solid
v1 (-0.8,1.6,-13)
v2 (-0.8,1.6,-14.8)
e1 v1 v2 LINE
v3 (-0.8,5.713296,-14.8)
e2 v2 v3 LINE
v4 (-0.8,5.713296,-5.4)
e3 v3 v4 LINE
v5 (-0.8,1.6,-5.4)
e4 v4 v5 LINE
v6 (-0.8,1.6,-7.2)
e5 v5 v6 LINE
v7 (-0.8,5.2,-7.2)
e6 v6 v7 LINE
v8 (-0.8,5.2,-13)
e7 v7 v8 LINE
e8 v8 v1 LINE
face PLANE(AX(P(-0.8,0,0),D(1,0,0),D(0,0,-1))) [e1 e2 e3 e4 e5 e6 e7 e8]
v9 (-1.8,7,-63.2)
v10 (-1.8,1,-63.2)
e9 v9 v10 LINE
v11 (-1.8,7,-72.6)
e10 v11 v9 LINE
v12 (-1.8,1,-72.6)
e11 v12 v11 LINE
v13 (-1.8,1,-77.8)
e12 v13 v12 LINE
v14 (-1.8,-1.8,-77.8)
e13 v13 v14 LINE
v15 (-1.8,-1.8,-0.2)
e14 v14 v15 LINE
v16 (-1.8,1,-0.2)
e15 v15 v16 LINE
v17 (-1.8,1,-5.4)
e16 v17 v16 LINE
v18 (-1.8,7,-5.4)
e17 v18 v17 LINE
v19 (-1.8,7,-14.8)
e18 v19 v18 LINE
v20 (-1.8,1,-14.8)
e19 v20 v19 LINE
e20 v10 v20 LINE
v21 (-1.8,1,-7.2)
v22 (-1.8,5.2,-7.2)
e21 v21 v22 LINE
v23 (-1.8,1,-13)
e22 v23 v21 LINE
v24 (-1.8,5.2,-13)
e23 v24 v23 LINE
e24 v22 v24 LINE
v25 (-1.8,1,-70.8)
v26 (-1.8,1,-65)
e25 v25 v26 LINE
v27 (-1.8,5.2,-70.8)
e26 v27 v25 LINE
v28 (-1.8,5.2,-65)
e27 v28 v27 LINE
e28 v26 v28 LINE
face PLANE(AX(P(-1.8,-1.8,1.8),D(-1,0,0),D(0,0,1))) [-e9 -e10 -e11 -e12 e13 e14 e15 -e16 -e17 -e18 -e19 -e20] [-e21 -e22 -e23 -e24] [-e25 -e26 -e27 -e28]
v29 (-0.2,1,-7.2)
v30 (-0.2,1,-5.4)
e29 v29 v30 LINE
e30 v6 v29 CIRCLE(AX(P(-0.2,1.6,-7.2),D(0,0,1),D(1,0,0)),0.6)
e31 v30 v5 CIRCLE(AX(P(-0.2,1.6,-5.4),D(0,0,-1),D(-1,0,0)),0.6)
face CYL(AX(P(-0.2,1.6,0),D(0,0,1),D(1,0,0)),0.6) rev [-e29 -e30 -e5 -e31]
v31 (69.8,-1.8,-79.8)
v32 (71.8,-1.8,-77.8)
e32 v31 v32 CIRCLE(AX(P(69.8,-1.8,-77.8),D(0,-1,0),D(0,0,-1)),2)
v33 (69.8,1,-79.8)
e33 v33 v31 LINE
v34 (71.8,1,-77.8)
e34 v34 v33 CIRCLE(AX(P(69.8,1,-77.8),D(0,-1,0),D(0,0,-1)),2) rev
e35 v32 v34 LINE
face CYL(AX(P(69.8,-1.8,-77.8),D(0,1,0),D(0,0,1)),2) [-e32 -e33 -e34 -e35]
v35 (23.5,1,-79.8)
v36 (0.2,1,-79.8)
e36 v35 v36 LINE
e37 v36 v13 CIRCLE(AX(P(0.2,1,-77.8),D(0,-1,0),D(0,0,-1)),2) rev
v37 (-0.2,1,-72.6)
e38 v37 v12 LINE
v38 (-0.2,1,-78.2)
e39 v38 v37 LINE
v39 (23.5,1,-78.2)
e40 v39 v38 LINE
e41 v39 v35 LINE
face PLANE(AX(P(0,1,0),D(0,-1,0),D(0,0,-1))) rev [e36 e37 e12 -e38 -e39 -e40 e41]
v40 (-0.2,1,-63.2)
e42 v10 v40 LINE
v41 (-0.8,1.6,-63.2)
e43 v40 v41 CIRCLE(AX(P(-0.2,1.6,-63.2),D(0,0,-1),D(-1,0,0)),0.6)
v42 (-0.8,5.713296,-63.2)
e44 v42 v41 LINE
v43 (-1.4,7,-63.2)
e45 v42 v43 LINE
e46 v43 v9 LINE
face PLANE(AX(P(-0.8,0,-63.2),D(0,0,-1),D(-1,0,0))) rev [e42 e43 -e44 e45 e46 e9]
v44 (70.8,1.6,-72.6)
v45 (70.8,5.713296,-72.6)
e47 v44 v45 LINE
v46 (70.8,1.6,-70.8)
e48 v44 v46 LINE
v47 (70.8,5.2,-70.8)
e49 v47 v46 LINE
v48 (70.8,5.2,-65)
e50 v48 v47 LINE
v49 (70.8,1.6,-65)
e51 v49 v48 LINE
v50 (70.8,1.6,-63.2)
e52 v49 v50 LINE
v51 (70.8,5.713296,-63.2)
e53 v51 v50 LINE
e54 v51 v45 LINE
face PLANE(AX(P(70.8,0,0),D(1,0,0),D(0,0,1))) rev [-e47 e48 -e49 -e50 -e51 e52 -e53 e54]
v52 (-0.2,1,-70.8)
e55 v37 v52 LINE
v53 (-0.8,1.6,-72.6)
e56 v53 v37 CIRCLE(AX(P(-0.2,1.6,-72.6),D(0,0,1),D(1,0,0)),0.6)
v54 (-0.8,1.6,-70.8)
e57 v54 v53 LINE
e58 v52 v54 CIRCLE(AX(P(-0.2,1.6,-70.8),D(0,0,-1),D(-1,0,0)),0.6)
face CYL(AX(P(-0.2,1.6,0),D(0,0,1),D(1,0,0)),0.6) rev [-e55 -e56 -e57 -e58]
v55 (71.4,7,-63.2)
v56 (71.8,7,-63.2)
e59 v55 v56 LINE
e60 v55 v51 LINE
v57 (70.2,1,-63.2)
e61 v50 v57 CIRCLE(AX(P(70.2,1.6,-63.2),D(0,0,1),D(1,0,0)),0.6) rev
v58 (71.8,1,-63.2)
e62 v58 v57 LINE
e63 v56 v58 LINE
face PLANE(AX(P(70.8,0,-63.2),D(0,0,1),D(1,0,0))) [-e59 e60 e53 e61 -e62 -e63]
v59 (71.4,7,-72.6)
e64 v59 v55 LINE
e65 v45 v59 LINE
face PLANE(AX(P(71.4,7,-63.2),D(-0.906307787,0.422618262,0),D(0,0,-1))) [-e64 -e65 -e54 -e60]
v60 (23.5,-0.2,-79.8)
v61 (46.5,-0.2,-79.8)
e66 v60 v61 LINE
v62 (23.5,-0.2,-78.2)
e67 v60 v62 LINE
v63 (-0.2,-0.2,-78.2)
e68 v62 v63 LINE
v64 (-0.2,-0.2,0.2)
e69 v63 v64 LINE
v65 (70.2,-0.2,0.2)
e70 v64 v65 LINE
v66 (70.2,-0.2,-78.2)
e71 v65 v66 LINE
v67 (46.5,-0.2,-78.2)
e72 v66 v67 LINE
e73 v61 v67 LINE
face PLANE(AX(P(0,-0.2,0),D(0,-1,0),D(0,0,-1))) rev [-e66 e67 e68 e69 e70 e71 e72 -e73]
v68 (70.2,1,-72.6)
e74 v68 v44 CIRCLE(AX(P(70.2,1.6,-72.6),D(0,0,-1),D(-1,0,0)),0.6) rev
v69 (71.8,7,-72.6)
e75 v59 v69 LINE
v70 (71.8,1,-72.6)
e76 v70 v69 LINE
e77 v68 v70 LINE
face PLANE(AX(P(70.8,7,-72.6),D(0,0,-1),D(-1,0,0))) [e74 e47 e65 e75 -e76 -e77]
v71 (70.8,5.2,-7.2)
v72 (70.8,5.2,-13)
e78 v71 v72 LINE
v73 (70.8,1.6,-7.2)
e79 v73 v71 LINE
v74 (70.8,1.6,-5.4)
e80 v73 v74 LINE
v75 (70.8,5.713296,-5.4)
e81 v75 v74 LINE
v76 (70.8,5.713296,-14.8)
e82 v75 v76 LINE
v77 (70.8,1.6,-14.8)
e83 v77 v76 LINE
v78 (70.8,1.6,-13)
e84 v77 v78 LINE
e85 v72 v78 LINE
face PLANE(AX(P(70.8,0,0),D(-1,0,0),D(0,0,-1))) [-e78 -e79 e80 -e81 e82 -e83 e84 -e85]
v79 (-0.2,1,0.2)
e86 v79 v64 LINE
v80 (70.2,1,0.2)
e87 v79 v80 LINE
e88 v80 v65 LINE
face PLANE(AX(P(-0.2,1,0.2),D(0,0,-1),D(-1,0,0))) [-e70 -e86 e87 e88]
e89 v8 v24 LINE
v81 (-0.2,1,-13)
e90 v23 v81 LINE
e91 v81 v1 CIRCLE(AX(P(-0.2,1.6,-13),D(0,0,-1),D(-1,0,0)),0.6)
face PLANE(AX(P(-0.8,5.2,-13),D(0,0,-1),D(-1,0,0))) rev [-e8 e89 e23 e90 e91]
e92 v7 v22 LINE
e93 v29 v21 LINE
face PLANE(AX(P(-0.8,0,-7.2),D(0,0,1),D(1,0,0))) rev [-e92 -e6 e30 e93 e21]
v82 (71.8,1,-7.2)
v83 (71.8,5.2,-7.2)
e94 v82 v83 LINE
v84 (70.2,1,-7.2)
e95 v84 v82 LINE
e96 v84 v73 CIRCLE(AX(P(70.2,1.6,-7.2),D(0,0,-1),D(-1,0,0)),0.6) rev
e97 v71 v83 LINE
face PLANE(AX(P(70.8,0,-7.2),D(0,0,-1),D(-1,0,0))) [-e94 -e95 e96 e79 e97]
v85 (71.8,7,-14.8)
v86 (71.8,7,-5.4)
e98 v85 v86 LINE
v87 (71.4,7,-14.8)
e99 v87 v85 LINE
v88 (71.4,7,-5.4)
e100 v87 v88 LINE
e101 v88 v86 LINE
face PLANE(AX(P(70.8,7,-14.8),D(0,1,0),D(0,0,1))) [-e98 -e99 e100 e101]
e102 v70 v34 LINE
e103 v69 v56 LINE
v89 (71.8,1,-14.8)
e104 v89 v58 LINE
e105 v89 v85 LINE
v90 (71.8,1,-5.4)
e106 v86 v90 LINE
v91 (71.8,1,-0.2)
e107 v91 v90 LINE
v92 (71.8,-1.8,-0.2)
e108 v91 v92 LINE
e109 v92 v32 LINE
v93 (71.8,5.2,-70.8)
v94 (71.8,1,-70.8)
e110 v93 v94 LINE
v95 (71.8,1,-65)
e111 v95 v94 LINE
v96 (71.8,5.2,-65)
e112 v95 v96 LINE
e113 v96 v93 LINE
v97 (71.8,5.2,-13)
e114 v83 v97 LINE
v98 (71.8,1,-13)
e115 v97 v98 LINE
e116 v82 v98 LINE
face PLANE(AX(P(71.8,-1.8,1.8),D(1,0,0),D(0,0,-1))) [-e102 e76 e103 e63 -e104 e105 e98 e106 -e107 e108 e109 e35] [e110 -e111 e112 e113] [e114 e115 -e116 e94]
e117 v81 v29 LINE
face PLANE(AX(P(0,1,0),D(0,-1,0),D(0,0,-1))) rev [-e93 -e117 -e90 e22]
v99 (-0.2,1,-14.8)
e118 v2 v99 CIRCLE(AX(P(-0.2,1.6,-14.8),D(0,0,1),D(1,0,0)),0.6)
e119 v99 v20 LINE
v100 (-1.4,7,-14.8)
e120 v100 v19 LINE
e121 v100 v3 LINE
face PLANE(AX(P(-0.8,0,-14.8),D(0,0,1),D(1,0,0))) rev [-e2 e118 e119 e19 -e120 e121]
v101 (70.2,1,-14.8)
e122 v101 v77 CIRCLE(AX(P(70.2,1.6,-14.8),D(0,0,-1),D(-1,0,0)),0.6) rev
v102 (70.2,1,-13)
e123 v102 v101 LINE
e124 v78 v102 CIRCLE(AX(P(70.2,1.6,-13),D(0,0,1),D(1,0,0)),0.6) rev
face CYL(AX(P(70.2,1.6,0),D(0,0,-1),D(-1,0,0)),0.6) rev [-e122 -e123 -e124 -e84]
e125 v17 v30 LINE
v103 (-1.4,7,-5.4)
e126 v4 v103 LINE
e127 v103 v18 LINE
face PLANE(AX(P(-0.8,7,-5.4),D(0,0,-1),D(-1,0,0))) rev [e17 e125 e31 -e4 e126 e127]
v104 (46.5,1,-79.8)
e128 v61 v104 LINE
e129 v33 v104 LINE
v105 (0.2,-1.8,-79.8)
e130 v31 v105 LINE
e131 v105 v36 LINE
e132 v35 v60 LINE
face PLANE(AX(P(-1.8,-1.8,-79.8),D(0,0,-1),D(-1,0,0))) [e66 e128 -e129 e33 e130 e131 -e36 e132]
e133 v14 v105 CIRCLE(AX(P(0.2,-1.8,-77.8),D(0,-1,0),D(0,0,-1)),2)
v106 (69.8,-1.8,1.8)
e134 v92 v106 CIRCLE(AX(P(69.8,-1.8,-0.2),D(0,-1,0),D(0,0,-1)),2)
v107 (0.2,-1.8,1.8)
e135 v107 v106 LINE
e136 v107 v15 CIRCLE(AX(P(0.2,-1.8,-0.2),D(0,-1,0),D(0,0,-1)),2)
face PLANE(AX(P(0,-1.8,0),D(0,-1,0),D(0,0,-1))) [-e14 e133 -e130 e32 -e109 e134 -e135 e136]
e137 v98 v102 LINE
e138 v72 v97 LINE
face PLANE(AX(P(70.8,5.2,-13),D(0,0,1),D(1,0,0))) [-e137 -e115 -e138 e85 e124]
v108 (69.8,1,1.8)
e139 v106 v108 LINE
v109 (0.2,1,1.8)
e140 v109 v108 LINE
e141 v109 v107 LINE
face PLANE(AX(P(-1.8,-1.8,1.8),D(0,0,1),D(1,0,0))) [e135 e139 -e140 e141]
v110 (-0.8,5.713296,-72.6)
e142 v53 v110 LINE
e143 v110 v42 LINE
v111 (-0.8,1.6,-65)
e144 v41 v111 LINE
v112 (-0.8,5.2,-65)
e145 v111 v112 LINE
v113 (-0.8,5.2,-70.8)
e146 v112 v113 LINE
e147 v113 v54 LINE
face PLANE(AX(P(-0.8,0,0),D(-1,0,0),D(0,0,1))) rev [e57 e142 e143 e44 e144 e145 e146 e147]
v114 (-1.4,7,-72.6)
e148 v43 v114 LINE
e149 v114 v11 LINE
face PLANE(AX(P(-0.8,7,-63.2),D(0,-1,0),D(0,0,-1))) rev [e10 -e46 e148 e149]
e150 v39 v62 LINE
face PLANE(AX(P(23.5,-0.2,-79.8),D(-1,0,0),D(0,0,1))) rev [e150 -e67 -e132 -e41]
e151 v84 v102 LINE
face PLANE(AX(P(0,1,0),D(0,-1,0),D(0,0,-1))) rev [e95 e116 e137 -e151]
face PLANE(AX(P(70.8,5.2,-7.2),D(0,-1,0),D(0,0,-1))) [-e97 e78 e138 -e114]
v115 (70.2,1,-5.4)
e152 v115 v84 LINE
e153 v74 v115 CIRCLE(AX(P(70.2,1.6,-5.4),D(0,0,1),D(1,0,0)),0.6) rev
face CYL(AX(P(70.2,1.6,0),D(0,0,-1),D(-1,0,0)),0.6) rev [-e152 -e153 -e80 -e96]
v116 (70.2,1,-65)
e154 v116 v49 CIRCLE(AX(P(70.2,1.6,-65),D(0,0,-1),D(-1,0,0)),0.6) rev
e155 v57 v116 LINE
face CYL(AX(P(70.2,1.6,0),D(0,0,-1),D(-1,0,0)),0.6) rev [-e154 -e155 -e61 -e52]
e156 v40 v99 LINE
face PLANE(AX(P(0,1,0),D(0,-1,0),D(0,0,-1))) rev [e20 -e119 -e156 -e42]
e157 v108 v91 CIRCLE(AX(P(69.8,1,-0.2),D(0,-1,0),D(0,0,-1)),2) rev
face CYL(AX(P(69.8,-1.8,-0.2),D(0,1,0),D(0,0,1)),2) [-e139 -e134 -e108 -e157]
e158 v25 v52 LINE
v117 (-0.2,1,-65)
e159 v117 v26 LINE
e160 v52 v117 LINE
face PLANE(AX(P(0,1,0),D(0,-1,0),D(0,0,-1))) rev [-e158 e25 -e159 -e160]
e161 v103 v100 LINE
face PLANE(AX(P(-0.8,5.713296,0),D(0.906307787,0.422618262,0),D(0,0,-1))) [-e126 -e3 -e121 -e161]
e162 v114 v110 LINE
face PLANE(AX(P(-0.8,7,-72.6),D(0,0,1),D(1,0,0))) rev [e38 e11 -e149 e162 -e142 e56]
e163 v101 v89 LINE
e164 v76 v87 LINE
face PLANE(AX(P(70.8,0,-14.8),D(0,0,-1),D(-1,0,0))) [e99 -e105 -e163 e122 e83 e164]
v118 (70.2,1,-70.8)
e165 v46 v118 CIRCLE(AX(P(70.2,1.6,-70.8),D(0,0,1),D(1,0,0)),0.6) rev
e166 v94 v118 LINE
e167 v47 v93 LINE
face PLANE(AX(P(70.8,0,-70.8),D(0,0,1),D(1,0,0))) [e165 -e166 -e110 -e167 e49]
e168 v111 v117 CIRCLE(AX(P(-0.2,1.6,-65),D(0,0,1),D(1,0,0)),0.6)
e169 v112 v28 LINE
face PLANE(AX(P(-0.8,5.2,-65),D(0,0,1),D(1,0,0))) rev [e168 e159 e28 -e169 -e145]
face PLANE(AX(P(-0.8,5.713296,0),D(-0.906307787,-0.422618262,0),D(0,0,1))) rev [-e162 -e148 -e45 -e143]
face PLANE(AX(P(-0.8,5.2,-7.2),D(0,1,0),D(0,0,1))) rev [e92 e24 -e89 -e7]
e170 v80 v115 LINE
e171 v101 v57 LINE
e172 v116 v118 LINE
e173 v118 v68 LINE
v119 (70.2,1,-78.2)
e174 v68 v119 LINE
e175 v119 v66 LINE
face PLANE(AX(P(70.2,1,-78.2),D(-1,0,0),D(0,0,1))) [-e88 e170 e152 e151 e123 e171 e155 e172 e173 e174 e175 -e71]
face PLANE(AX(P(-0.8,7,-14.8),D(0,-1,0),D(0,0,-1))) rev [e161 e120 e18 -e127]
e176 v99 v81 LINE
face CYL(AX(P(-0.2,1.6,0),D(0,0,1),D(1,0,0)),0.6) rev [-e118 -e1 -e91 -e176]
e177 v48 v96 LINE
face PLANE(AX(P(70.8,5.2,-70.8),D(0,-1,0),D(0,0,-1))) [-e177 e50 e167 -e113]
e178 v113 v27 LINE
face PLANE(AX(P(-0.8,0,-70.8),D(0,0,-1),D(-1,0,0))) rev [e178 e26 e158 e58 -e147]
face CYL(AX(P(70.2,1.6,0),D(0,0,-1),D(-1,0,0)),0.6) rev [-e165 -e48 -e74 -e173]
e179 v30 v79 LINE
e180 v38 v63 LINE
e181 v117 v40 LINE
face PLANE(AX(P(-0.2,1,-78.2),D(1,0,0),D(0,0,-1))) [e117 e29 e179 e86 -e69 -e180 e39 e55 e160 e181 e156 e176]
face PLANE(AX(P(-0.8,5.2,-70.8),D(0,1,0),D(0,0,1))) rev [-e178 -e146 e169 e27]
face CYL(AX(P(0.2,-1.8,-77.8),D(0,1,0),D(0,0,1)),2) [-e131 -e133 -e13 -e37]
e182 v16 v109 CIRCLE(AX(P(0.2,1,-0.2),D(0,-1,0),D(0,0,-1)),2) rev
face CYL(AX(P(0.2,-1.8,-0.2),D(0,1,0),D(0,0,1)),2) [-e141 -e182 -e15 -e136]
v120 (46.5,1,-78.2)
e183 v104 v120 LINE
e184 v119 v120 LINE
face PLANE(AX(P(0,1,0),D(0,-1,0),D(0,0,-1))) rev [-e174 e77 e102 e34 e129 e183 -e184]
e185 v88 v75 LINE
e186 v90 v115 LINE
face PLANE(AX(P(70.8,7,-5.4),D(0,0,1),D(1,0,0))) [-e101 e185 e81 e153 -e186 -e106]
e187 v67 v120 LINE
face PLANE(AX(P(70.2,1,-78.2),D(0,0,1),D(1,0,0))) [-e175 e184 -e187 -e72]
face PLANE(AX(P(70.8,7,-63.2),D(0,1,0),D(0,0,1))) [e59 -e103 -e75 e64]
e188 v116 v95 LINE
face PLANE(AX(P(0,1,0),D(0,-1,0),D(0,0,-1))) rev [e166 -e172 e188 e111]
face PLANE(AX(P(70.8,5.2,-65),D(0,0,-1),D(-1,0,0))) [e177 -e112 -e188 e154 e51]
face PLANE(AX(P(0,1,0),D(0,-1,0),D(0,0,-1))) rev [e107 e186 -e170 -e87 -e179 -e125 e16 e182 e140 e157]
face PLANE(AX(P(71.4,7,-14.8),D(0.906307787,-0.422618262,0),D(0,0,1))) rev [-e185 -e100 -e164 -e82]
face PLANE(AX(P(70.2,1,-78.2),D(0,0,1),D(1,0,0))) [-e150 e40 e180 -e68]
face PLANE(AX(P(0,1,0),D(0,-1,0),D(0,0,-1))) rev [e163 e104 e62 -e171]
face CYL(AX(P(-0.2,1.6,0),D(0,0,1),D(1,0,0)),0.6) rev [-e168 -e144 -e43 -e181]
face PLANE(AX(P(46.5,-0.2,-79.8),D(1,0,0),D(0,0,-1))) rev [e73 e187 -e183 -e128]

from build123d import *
from OCP.BRepFilletAPI import BRepFilletAPI_MakeChamfer

# Parameters (mm, degrees)
SKIZZE1_W                       = 73.6
SKIZZE1_H                       = 81.6
AUFSATZ_LINEAR_AUSTRAGEN1_DEPTH = 1.6
SKIZZE2_W                       = 73.6
SKIZZE2_H                       = 81.6
SKIZZE2_W_2                     = 70.4
SKIZZE2_H_2                     = 78.4
AUFSATZ_LINEAR_AUSTRAGEN2_DEPTH = 1.2
SKIZZE3_W                       = 23
SKIZZE3_H                       = 4
SCHNITT_LINEAR_AUSTRAGEN1_DEPTH = 1.6
AUFSATZ_LINEAR_AUSTRAGEN3_DEPTH = 1
VERRUNDUNG1_R                   = 0.6
FASE1_SIZE                      = 0.6
FASE1_SIZE2                     = 1.286704152
VERRUNDUNG2_R                   = 2


with BuildPart() as part:
    # Skizze1 → Aufsatz-Linear austragen1 (new body)
    with BuildSketch(Plane(origin=(0, -0.2, 0), x_dir=(1, 0, 0), z_dir=(0, 1, 0))):
        with Locations((35, 39)):
            Rectangle(SKIZZE1_W, SKIZZE1_H)
    extrude(amount=-AUFSATZ_LINEAR_AUSTRAGEN1_DEPTH)

    # Skizze2 → Aufsatz-Linear austragen2 (add)
    with BuildSketch(Plane(origin=(0, -0.2, 0), x_dir=(1, 0, 0), z_dir=(0, 1, 0))):
        with Locations((35, 39)):
            Rectangle(SKIZZE2_W, SKIZZE2_H)
        with Locations((35, 39)):
            Rectangle(SKIZZE2_W_2, SKIZZE2_H_2, mode=Mode.SUBTRACT)
    extrude(amount=AUFSATZ_LINEAR_AUSTRAGEN2_DEPTH)

    # Skizze3 → Schnitt-Linear austragen1 (cut)
    with BuildSketch(Plane.XY.offset(-78.2)):
        with Locations((35, 1.8)):
            Rectangle(SKIZZE3_W, SKIZZE3_H)
    extrude(amount=-SCHNITT_LINEAR_AUSTRAGEN1_DEPTH, mode=Mode.SUBTRACT)

    # Skizze4 → Aufsatz-Linear austragen3 (add)
    with BuildSketch(Plane(origin=(-1.8, 0, 0), x_dir=(0, 0, -1), z_dir=(1, 0, 0))):
        Polygon((63.2, 0), (63.2, 7), (72.6, 7), (72.6, 0), (70.8, 0), (70.8, 5.2), (65, 5.2), (65, 0), align=None)
        Polygon((14.8, 7), (5.4, 7), (5.4, 0), (7.2, 0), (7.2, 5.2), (13, 5.2), (13, 0), (14.8, 0), align=None)
    aufsatz_linear_austragen3 = extrude(amount=AUFSATZ_LINEAR_AUSTRAGEN3_DEPTH)

    # Spiegeln1: Aufsatz-Linear austragen3 across plane
    add(aufsatz_linear_austragen3.mirror(Plane(origin=(35, 0, 0), x_dir=(0, 0, 1), z_dir=(1, 0, 0))))

    # Verrundung1
    verrundung1_edges = [part.edges().sort_by_distance(p)[0] for p in [
        (70.8, 1, -64.1),
        (70.8, 1, -71.7),
        (70.8, 1, -13.9),
        (70.8, 1, -6.3),
        (-0.8, 1, -71.7),
        (-0.8, 1, -64.1),
        (-0.8, 1, -6.3),
        (-0.8, 1, -13.9),
    ]]
    fillet(verrundung1_edges, radius=VERRUNDUNG1_R - 0.0001)  # a hair under: the kernel refuses the full size

    # Fase1: one chamfer whose edges measure the first distance from different faces: ONE call of the kernel's chamfer builder (chamfer() names one face for all edges)
    fase1_edges_1 = [part.edges().sort_by_distance(p)[0] for p in [
        (70.8, 7, -67.9),
    ]]
    fase1_side_1 = [part.faces().sort_by_distance(p)[0] for p in [
        (71.3, 7, -67.9),
    ]]
    fase1_edges_2 = [part.edges().sort_by_distance(p)[0] for p in [
        (70.8, 7, -10.1),
    ]]
    fase1_side_2 = [part.faces().sort_by_distance(p)[0] for p in [
        (71.3, 7, -10.1),
    ]]
    fase1_edges_3 = [part.edges().sort_by_distance(p)[0] for p in [
        (-0.8, 7, -67.9),
    ]]
    fase1_side_3 = [part.faces().sort_by_distance(p)[0] for p in [
        (-1.3, 7, -67.9),
    ]]
    fase1_edges_4 = [part.edges().sort_by_distance(p)[0] for p in [
        (-0.8, 7, -10.1),
    ]]
    fase1_side_4 = [part.faces().sort_by_distance(p)[0] for p in [
        (-1.3, 7, -10.1),
    ]]
    fase1 = BRepFilletAPI_MakeChamfer(part.part.solid().wrapped)
    for e in fase1_edges_1:
        fase1.Add(FASE1_SIZE, FASE1_SIZE2, e.wrapped, fase1_side_1[0].wrapped)  # the first distance lies on this face
    for e in fase1_edges_2:
        fase1.Add(FASE1_SIZE, FASE1_SIZE2, e.wrapped, fase1_side_2[0].wrapped)  # the first distance lies on this face
    for e in fase1_edges_3:
        fase1.Add(FASE1_SIZE, FASE1_SIZE2, e.wrapped, fase1_side_3[0].wrapped)  # the first distance lies on this face
    for e in fase1_edges_4:
        fase1.Add(FASE1_SIZE, FASE1_SIZE2, e.wrapped, fase1_side_4[0].wrapped)  # the first distance lies on this face
    add(Compound.cast(fase1.Shape()), mode=Mode.REPLACE)

    # Verrundung2
    verrundung2_edges = [part.edges().sort_by_distance(p)[0] for p in [
        (-1.8, -0.4, -79.8),
        (71.8, -0.4, -79.8),
        (71.8, -0.4, 1.8),
        (-1.8, -0.4, 1.8),
    ]]
    fillet(verrundung2_edges, radius=VERRUNDUNG2_R)


solid = part.part
